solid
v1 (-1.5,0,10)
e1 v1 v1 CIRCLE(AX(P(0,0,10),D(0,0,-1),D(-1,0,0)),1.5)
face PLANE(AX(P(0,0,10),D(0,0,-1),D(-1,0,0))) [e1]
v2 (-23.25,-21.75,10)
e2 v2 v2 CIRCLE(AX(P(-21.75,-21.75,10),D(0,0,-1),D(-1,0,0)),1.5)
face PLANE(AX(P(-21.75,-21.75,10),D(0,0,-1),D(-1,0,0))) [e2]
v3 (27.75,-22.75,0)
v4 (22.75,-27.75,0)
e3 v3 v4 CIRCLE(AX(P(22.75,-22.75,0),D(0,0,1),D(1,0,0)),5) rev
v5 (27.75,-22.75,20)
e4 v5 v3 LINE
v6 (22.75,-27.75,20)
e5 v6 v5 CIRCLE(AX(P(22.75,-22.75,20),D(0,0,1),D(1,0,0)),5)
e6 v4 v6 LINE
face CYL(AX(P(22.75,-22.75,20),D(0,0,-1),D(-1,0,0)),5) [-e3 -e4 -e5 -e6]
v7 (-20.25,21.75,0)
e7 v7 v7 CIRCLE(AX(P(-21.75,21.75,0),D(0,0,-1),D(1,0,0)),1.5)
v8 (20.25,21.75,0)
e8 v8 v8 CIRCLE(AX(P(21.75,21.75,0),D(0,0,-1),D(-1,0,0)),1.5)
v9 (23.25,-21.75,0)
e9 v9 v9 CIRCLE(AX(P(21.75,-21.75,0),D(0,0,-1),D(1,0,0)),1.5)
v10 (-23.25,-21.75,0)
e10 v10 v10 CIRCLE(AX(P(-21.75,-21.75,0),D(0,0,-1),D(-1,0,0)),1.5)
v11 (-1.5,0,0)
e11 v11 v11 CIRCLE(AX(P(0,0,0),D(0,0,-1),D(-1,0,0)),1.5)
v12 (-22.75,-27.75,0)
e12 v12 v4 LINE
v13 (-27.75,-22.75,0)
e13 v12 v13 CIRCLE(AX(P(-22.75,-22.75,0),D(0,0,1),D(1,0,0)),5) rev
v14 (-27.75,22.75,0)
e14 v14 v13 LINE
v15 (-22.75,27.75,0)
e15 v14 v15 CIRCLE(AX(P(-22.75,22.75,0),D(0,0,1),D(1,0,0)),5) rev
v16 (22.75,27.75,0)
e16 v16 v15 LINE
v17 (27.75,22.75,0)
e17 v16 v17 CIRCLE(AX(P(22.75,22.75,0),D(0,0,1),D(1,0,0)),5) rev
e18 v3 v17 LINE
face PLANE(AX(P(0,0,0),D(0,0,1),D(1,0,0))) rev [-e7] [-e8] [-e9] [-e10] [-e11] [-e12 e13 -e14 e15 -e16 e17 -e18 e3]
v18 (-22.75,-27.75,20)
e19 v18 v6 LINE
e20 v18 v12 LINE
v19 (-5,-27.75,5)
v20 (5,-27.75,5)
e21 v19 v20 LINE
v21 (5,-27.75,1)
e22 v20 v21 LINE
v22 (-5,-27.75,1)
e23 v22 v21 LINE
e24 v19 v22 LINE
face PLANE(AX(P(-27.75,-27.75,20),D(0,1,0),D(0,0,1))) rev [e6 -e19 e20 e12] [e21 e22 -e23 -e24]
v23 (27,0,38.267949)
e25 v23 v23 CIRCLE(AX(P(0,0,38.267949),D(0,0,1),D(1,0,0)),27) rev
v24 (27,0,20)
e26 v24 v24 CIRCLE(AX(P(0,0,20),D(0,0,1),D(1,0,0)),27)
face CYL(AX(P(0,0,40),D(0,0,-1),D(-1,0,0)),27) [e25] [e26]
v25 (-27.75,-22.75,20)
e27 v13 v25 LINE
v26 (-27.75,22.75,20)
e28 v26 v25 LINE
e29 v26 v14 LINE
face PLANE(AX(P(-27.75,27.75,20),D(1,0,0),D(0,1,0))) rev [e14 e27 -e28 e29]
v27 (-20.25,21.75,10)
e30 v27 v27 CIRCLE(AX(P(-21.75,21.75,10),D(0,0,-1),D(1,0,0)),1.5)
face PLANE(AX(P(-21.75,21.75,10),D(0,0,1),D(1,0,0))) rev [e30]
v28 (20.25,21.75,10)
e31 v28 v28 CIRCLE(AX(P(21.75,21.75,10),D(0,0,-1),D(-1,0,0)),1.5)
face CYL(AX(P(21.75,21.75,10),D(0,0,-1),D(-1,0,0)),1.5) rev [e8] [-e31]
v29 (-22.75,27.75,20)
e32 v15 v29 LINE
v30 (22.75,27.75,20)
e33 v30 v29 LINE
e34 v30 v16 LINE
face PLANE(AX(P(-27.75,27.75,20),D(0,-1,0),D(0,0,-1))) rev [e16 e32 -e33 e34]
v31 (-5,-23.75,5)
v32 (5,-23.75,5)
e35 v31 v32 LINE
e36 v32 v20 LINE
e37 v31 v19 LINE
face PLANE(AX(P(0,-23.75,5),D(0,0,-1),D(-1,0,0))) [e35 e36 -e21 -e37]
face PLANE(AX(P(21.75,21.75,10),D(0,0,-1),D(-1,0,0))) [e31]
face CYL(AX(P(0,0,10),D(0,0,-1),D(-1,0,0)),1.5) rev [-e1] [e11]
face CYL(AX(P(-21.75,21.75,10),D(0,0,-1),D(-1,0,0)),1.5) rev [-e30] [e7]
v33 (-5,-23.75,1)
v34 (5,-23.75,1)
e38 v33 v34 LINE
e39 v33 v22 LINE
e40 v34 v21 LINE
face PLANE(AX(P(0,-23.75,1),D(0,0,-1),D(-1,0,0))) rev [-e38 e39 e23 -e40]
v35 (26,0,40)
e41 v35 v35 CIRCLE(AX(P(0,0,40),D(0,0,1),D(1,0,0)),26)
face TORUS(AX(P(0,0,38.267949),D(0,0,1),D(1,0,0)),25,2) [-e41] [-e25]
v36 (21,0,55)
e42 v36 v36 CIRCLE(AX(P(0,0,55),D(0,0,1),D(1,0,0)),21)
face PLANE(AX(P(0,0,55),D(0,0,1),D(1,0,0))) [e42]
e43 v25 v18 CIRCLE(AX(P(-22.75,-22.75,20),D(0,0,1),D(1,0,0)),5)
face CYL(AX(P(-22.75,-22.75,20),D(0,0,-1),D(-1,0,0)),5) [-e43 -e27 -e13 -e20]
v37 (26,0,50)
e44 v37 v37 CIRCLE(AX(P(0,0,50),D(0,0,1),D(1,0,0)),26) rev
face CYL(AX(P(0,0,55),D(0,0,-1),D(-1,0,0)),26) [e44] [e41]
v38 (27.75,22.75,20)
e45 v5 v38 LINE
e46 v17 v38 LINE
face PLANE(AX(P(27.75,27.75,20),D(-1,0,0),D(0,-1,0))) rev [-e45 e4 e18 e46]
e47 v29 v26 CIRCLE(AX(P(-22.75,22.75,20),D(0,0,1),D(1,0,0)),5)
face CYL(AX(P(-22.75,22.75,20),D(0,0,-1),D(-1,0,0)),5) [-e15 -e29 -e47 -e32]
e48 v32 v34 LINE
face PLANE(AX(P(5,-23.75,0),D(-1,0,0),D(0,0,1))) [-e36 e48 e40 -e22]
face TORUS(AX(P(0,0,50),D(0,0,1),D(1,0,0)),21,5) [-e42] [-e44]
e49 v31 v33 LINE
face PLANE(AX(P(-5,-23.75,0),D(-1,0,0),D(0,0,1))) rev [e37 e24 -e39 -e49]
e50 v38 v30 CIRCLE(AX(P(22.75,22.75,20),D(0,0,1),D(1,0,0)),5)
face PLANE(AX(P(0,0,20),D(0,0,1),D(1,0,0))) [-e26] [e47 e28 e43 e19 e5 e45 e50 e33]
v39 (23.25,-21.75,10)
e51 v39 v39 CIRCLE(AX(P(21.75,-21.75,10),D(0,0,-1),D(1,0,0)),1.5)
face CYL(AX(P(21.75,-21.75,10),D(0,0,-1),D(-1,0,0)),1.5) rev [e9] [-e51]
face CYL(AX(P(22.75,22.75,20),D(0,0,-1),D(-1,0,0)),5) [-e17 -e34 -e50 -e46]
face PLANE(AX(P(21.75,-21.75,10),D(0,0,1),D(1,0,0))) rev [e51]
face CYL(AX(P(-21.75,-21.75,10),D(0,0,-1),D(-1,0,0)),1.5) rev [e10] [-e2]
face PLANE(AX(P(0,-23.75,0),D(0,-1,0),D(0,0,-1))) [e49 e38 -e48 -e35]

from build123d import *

# Parameters (mm, degrees)
SKETCH_1_W          = 55.5
SKETCH_1_H          = 55.5
EXTRUDE_1_DEPTH     = 20
SKETCH_2_R          = 27
EXTRUDE_3_DEPTH     = 20
SKETCH_3_R          = 26
EXTRUDE_6_DEPTH     = 15
FILLET_1_R          = 5
FILLET_2_R          = 2
FILLET_3_R          = 5
SKETCH_5_R          = 1.5
CUT_EXTRUDE_1_DEPTH = 10
SKETCH_6_W          = 5
SKETCH_6_H          = 4
CUT_EXTRUDE_2_DEPTH = 4


with BuildPart() as part:
    # 草图1 → 凸台-拉伸1 (new body)
    with BuildSketch(Plane.XY):
        Rectangle(SKETCH_1_W, SKETCH_1_H)
    extrude(amount=EXTRUDE_1_DEPTH)

    # 草图2 → 凸台-拉伸3 (add)
    with BuildSketch(Plane.XY.offset(20)):
        Circle(SKETCH_2_R)
    extrude(amount=EXTRUDE_3_DEPTH)

    # 草图3 → 凸台-拉伸6 (add)
    with BuildSketch(Plane.XY.offset(40)):
        Circle(SKETCH_3_R)
    extrude(amount=EXTRUDE_6_DEPTH)

    # 圆角1
    fillet_1_edges = [part.edges().sort_by_distance(p)[0] for p in [
        (-26, 0, 55),
    ]]
    fillet(fillet_1_edges, radius=FILLET_1_R)

    # 圆角2
    # the kernel refuses this fillet: 2 mm, written as the material it takes off along each edge
    with BuildSketch(Plane(origin=(0, 0, 40), x_dir=(1, 0, 0), z_dir=(0, -1, 0))) as fillet_2_piece_1:
        with BuildLine():
            CenterArc((25, -1.732050808), FILLET_2_R, 0, 60)
            Line((27, -1.732050808), (27.04, -1.732050808))
            Line((27.04, -1.732050808), (27.04, 0))
            Line((27.04, 0), (27, 0.04))
            ThreePointArc((27, 0.04), (26.5, 0.04), (26.02, 0.034641016))
            Line((26.02, 0.034641016), (26, 0))
        make_face()
    revolve(axis=Axis((0, 0, 40), (0, 0, 1)), mode=Mode.SUBTRACT)

    # 圆角3
    fillet_3_edges = [part.edges().sort_by_distance(p)[0] for p in [
        (-27.75, 27.75, 10),
        (27.75, 27.75, 10),
        (27.75, -27.75, 10),
        (-27.75, -27.75, 10),
    ]]
    fillet(fillet_3_edges, radius=FILLET_3_R)

    # 草图5 → 切除-拉伸1 (cut)
    with BuildSketch(Plane(origin=(0, 0, 0), x_dir=(-1, 0, 0), z_dir=(0, 0, -1))):
        Circle(SKETCH_5_R)
        with Locations((-21.75, 21.75)):
            Circle(SKETCH_5_R)
        with Locations(Location((21.75, 21.75, 0), (0, 0, 180))):
            Circle(SKETCH_5_R)
        with Locations((21.75, -21.75)):
            Circle(SKETCH_5_R)
        with Locations(Location((-21.75, -21.75, 0), (0, 0, 180))):
            Circle(SKETCH_5_R)
    extrude(amount=-CUT_EXTRUDE_1_DEPTH, mode=Mode.SUBTRACT)

    # 草图6 → 切除-拉伸2 (cut)
    with BuildSketch(Plane.XZ.offset(27.75)):
        with Locations((-2.5, 3)):
            Rectangle(SKETCH_6_W, SKETCH_6_H)
        with Locations((2.5, 3)):
            Rectangle(SKETCH_6_W, SKETCH_6_H)
    extrude(amount=-CUT_EXTRUDE_2_DEPTH, mode=Mode.SUBTRACT)


solid = part.part
